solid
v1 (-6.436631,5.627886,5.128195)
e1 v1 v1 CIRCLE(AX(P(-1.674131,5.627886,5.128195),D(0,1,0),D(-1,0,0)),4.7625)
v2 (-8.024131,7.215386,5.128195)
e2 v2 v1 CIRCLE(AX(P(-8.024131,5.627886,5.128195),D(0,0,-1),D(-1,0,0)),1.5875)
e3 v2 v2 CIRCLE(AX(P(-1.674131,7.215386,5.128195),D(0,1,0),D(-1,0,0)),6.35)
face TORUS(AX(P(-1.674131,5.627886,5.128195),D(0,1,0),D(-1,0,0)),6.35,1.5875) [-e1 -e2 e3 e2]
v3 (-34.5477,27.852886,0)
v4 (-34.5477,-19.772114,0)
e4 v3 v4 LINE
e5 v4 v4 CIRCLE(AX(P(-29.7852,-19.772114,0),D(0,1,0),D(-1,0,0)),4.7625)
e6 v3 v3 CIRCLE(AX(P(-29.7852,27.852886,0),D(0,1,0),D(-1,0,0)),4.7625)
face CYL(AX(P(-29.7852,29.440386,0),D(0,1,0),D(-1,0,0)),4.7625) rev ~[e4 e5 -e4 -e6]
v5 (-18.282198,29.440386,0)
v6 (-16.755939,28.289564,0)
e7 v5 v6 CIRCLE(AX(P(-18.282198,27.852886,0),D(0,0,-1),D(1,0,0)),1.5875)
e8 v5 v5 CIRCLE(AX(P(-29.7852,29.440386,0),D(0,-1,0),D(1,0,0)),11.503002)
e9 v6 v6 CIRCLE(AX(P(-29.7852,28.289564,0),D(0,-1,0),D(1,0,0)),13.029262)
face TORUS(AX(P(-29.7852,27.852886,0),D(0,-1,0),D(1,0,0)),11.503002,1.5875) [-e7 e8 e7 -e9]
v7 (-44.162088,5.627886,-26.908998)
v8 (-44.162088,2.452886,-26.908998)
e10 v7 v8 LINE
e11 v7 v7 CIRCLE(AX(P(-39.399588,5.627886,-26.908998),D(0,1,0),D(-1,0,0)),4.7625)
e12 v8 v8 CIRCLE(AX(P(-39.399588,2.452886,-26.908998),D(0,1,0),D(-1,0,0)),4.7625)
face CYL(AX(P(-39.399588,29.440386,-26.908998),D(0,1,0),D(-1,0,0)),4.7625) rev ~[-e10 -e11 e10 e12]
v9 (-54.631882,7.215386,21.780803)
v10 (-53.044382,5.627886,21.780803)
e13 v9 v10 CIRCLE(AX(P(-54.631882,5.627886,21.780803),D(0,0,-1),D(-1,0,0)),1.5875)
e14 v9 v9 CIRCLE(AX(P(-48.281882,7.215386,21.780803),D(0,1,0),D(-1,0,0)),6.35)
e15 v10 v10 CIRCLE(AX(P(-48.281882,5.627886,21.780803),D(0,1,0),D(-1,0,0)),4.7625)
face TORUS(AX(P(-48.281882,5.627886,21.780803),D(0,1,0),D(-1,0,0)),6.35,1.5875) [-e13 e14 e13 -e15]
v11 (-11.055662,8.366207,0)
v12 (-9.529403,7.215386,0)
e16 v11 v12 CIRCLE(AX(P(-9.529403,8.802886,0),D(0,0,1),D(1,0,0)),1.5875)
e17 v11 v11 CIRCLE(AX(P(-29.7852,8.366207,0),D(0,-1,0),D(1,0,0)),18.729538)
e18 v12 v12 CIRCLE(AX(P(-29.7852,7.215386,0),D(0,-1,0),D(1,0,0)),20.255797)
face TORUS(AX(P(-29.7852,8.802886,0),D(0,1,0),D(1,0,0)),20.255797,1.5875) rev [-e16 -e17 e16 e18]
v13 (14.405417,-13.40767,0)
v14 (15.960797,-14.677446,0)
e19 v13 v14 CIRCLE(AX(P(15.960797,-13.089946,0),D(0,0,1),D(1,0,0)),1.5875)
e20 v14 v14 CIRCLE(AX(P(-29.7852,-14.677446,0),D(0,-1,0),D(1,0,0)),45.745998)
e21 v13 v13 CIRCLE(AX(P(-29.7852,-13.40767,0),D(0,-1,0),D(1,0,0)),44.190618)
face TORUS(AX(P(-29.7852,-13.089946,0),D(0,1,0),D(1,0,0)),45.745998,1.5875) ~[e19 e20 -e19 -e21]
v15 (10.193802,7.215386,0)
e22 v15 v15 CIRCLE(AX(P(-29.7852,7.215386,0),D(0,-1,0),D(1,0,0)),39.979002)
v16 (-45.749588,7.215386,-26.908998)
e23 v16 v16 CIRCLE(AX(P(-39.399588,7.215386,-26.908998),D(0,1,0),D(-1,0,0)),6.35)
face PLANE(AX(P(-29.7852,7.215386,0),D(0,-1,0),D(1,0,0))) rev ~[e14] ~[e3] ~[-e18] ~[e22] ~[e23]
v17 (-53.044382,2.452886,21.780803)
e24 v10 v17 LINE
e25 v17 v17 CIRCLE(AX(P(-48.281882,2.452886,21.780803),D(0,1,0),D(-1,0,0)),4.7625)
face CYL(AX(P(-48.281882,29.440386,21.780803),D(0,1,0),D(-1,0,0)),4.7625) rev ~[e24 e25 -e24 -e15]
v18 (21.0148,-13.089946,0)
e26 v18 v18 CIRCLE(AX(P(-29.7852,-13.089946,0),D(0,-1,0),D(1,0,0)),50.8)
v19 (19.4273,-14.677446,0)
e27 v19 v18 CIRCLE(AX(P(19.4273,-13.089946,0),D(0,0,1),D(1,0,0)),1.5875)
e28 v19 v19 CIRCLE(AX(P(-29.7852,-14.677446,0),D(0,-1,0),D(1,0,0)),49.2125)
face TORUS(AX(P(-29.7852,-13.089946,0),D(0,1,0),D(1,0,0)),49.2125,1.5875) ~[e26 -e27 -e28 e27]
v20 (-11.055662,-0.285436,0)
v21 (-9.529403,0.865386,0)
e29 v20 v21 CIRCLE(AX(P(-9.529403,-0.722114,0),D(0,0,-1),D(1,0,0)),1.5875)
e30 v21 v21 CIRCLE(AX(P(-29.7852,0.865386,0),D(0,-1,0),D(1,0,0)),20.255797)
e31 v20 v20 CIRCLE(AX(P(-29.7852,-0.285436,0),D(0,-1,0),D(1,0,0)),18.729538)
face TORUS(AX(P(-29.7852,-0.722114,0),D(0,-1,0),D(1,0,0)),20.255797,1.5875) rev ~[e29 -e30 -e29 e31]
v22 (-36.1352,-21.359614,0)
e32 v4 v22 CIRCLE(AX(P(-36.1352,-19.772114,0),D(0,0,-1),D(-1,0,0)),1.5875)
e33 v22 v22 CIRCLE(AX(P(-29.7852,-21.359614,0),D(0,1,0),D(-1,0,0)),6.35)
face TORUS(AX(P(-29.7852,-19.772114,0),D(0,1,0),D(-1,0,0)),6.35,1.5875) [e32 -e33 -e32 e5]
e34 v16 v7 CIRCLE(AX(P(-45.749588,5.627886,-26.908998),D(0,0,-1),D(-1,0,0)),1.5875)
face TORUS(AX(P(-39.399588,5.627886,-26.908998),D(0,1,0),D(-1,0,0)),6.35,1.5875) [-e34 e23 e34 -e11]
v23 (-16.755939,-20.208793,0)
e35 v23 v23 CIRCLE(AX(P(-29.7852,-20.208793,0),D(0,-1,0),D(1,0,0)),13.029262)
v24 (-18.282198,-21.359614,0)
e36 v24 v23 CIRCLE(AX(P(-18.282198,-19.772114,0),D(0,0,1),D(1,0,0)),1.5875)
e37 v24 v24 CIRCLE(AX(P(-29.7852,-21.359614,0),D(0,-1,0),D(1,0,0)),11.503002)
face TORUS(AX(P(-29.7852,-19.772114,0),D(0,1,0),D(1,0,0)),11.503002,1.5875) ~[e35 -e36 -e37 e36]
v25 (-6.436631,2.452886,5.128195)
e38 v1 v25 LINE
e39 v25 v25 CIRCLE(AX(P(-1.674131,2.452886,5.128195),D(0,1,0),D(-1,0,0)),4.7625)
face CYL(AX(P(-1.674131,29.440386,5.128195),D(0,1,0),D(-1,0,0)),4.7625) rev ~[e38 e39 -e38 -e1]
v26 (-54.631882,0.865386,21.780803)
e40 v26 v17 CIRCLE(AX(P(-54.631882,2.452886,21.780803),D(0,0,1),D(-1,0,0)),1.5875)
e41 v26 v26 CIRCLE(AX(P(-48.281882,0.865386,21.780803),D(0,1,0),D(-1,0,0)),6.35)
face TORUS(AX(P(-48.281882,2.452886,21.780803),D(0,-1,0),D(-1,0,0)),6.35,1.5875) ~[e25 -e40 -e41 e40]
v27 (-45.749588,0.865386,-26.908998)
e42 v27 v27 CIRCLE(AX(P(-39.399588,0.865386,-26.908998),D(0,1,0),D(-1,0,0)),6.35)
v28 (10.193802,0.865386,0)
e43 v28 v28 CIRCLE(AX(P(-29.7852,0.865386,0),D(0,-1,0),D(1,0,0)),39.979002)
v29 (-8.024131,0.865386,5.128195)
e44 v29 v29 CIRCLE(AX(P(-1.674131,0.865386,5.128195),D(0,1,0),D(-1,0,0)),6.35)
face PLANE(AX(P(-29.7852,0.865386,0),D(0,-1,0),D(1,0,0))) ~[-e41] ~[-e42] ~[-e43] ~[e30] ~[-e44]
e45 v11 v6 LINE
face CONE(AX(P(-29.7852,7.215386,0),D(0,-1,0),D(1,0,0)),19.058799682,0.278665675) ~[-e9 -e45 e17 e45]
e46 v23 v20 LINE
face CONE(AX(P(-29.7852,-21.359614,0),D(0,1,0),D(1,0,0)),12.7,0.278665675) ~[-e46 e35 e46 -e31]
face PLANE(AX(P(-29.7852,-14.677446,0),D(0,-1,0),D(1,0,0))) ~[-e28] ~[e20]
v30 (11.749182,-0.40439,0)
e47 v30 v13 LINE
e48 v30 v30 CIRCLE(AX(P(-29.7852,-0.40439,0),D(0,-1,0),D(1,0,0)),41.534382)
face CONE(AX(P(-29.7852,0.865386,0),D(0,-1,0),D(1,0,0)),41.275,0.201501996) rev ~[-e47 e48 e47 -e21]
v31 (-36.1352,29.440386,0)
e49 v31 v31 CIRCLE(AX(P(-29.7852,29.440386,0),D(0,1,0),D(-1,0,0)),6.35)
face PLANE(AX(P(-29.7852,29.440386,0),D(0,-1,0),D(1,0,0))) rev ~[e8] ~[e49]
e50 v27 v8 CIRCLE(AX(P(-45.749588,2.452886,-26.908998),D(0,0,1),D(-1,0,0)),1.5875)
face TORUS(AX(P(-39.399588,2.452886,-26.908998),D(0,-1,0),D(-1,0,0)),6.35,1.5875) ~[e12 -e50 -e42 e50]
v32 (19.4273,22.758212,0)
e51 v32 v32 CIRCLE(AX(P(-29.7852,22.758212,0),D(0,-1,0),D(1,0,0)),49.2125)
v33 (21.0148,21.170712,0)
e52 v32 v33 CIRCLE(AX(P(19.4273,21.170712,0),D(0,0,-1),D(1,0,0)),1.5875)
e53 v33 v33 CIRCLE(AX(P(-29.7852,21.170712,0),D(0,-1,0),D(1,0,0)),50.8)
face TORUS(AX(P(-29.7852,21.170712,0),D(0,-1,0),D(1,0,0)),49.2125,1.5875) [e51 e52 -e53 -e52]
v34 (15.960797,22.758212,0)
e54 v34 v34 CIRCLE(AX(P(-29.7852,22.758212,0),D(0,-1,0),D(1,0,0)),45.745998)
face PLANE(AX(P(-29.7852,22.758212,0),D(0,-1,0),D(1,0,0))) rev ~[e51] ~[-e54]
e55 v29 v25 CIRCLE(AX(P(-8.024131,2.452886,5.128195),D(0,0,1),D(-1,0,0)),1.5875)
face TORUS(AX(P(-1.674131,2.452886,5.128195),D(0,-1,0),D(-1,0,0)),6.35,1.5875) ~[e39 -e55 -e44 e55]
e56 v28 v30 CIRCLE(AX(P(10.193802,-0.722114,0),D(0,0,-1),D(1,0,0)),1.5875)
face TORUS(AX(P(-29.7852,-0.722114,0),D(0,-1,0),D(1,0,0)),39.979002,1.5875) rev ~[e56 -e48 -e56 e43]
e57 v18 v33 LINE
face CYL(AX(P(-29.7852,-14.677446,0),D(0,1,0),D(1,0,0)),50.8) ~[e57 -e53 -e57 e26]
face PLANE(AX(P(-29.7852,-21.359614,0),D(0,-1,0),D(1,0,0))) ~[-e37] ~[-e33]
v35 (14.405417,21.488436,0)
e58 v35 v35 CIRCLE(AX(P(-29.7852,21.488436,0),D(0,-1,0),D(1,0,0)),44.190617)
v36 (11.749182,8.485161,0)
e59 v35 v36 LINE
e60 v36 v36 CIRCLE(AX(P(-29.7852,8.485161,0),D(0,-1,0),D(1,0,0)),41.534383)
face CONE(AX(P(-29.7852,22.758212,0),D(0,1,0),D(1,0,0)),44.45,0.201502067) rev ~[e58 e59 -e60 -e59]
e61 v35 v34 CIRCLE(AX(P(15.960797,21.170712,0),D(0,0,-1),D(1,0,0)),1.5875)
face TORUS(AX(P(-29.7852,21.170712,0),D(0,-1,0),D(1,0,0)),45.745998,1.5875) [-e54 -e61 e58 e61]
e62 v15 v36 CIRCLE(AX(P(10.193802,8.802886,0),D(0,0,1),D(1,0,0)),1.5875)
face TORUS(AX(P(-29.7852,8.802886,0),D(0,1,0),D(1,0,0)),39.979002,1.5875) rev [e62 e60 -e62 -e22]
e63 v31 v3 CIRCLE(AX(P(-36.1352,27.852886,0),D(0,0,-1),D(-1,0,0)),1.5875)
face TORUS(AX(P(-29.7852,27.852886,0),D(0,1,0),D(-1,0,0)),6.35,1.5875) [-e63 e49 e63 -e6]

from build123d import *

# Parameters (mm, degrees)
F2_R     = 4.7625
F3_DEPTH = 50.801
F4_R     = 1.5875
F5_R     = 1.5875


# Not quite as in the source:
# - the program builds the solid bodies; features that only make, move or delete a surface that nothing else refers to are left out


with BuildPart() as f1:
    # F0 (on Top) → F1 (revolve)
    with BuildSketch(Plane.XY):
        Polygon((-17.0852003332, 29.4403855965), (-29.7852003332, 29.4403855965), (-29.7852003332, -21.3596144035), (-17.0852003332, -21.3596144035), (-10.726400651, 0.8653855965), (11.4897996668, 0.8653855965), (14.6647996668, -14.6774463356), (21.0147996668, -14.6774463356), (21.0147996668, 0.8653855965), (21.0147996668, 4.0403855965), (21.0147996668, 22.7582119405), (14.6647996668, 22.7582119405), (11.4897996668, 7.2153855965), (-10.726400651, 7.2153855965), align=None)
    revolve(axis=Axis((-29.7852003332, 4.0403855965, 0), (0, -1, 0)))

    # F2 (on face) → F3 (cut, through all)
    with BuildSketch(Plane(origin=(0, 29.4403855965, 0), x_dir=(-1, 0, 0), z_dir=(0, 1, 0))):
        with Locations((29.7852003332, 0)):
            Circle(F2_R)
        with Locations((39.3995883172, -26.9089979132)):
            Circle(F2_R)
        with Locations((48.2818821243, 21.7808031926)):
            Circle(F2_R)
        with Locations((1.6741305579, 5.1281947206)):
            Circle(F2_R)
    extrude(amount=-F3_DEPTH, mode=Mode.SUBTRACT)

    # F4
    f4_edges = [f1.edges().sort_by_distance(p)[0] for p in [
        (-25.0227, 29.440386, 0),
        (-42.4852, 29.440386, 0),
        (-48.844, 7.215386, 0),
        (-43.519382, 7.215386, 21.780803),
        (3.088369, 7.215386, 5.128195),
        (-34.637088, 7.215386, -26.908998),
        (-71.0602, 7.215386, 0),
        (-74.2352, 22.758212, 0),
        (-80.5852, 22.758212, 0),
    ]]
    fillet(f4_edges, radius=F4_R)

    # F5
    f5_edges = [f1.edges().sort_by_distance(p)[0] for p in [
        (-25.0227, -21.359614, 0),
        (-42.4852, -21.359614, 0),
        (-48.844, 0.865386, 0),
        (-43.519382, 0.865386, 21.780803),
        (3.088369, 0.865386, 5.128195),
        (-34.637088, 0.865386, -26.908998),
        (-71.0602, 0.865386, 0),
        (-74.2352, -14.677446, 0),
        (-80.5852, -14.677446, 0),
    ]]
    fillet(f5_edges, radius=F5_R)


solid = f1.part
